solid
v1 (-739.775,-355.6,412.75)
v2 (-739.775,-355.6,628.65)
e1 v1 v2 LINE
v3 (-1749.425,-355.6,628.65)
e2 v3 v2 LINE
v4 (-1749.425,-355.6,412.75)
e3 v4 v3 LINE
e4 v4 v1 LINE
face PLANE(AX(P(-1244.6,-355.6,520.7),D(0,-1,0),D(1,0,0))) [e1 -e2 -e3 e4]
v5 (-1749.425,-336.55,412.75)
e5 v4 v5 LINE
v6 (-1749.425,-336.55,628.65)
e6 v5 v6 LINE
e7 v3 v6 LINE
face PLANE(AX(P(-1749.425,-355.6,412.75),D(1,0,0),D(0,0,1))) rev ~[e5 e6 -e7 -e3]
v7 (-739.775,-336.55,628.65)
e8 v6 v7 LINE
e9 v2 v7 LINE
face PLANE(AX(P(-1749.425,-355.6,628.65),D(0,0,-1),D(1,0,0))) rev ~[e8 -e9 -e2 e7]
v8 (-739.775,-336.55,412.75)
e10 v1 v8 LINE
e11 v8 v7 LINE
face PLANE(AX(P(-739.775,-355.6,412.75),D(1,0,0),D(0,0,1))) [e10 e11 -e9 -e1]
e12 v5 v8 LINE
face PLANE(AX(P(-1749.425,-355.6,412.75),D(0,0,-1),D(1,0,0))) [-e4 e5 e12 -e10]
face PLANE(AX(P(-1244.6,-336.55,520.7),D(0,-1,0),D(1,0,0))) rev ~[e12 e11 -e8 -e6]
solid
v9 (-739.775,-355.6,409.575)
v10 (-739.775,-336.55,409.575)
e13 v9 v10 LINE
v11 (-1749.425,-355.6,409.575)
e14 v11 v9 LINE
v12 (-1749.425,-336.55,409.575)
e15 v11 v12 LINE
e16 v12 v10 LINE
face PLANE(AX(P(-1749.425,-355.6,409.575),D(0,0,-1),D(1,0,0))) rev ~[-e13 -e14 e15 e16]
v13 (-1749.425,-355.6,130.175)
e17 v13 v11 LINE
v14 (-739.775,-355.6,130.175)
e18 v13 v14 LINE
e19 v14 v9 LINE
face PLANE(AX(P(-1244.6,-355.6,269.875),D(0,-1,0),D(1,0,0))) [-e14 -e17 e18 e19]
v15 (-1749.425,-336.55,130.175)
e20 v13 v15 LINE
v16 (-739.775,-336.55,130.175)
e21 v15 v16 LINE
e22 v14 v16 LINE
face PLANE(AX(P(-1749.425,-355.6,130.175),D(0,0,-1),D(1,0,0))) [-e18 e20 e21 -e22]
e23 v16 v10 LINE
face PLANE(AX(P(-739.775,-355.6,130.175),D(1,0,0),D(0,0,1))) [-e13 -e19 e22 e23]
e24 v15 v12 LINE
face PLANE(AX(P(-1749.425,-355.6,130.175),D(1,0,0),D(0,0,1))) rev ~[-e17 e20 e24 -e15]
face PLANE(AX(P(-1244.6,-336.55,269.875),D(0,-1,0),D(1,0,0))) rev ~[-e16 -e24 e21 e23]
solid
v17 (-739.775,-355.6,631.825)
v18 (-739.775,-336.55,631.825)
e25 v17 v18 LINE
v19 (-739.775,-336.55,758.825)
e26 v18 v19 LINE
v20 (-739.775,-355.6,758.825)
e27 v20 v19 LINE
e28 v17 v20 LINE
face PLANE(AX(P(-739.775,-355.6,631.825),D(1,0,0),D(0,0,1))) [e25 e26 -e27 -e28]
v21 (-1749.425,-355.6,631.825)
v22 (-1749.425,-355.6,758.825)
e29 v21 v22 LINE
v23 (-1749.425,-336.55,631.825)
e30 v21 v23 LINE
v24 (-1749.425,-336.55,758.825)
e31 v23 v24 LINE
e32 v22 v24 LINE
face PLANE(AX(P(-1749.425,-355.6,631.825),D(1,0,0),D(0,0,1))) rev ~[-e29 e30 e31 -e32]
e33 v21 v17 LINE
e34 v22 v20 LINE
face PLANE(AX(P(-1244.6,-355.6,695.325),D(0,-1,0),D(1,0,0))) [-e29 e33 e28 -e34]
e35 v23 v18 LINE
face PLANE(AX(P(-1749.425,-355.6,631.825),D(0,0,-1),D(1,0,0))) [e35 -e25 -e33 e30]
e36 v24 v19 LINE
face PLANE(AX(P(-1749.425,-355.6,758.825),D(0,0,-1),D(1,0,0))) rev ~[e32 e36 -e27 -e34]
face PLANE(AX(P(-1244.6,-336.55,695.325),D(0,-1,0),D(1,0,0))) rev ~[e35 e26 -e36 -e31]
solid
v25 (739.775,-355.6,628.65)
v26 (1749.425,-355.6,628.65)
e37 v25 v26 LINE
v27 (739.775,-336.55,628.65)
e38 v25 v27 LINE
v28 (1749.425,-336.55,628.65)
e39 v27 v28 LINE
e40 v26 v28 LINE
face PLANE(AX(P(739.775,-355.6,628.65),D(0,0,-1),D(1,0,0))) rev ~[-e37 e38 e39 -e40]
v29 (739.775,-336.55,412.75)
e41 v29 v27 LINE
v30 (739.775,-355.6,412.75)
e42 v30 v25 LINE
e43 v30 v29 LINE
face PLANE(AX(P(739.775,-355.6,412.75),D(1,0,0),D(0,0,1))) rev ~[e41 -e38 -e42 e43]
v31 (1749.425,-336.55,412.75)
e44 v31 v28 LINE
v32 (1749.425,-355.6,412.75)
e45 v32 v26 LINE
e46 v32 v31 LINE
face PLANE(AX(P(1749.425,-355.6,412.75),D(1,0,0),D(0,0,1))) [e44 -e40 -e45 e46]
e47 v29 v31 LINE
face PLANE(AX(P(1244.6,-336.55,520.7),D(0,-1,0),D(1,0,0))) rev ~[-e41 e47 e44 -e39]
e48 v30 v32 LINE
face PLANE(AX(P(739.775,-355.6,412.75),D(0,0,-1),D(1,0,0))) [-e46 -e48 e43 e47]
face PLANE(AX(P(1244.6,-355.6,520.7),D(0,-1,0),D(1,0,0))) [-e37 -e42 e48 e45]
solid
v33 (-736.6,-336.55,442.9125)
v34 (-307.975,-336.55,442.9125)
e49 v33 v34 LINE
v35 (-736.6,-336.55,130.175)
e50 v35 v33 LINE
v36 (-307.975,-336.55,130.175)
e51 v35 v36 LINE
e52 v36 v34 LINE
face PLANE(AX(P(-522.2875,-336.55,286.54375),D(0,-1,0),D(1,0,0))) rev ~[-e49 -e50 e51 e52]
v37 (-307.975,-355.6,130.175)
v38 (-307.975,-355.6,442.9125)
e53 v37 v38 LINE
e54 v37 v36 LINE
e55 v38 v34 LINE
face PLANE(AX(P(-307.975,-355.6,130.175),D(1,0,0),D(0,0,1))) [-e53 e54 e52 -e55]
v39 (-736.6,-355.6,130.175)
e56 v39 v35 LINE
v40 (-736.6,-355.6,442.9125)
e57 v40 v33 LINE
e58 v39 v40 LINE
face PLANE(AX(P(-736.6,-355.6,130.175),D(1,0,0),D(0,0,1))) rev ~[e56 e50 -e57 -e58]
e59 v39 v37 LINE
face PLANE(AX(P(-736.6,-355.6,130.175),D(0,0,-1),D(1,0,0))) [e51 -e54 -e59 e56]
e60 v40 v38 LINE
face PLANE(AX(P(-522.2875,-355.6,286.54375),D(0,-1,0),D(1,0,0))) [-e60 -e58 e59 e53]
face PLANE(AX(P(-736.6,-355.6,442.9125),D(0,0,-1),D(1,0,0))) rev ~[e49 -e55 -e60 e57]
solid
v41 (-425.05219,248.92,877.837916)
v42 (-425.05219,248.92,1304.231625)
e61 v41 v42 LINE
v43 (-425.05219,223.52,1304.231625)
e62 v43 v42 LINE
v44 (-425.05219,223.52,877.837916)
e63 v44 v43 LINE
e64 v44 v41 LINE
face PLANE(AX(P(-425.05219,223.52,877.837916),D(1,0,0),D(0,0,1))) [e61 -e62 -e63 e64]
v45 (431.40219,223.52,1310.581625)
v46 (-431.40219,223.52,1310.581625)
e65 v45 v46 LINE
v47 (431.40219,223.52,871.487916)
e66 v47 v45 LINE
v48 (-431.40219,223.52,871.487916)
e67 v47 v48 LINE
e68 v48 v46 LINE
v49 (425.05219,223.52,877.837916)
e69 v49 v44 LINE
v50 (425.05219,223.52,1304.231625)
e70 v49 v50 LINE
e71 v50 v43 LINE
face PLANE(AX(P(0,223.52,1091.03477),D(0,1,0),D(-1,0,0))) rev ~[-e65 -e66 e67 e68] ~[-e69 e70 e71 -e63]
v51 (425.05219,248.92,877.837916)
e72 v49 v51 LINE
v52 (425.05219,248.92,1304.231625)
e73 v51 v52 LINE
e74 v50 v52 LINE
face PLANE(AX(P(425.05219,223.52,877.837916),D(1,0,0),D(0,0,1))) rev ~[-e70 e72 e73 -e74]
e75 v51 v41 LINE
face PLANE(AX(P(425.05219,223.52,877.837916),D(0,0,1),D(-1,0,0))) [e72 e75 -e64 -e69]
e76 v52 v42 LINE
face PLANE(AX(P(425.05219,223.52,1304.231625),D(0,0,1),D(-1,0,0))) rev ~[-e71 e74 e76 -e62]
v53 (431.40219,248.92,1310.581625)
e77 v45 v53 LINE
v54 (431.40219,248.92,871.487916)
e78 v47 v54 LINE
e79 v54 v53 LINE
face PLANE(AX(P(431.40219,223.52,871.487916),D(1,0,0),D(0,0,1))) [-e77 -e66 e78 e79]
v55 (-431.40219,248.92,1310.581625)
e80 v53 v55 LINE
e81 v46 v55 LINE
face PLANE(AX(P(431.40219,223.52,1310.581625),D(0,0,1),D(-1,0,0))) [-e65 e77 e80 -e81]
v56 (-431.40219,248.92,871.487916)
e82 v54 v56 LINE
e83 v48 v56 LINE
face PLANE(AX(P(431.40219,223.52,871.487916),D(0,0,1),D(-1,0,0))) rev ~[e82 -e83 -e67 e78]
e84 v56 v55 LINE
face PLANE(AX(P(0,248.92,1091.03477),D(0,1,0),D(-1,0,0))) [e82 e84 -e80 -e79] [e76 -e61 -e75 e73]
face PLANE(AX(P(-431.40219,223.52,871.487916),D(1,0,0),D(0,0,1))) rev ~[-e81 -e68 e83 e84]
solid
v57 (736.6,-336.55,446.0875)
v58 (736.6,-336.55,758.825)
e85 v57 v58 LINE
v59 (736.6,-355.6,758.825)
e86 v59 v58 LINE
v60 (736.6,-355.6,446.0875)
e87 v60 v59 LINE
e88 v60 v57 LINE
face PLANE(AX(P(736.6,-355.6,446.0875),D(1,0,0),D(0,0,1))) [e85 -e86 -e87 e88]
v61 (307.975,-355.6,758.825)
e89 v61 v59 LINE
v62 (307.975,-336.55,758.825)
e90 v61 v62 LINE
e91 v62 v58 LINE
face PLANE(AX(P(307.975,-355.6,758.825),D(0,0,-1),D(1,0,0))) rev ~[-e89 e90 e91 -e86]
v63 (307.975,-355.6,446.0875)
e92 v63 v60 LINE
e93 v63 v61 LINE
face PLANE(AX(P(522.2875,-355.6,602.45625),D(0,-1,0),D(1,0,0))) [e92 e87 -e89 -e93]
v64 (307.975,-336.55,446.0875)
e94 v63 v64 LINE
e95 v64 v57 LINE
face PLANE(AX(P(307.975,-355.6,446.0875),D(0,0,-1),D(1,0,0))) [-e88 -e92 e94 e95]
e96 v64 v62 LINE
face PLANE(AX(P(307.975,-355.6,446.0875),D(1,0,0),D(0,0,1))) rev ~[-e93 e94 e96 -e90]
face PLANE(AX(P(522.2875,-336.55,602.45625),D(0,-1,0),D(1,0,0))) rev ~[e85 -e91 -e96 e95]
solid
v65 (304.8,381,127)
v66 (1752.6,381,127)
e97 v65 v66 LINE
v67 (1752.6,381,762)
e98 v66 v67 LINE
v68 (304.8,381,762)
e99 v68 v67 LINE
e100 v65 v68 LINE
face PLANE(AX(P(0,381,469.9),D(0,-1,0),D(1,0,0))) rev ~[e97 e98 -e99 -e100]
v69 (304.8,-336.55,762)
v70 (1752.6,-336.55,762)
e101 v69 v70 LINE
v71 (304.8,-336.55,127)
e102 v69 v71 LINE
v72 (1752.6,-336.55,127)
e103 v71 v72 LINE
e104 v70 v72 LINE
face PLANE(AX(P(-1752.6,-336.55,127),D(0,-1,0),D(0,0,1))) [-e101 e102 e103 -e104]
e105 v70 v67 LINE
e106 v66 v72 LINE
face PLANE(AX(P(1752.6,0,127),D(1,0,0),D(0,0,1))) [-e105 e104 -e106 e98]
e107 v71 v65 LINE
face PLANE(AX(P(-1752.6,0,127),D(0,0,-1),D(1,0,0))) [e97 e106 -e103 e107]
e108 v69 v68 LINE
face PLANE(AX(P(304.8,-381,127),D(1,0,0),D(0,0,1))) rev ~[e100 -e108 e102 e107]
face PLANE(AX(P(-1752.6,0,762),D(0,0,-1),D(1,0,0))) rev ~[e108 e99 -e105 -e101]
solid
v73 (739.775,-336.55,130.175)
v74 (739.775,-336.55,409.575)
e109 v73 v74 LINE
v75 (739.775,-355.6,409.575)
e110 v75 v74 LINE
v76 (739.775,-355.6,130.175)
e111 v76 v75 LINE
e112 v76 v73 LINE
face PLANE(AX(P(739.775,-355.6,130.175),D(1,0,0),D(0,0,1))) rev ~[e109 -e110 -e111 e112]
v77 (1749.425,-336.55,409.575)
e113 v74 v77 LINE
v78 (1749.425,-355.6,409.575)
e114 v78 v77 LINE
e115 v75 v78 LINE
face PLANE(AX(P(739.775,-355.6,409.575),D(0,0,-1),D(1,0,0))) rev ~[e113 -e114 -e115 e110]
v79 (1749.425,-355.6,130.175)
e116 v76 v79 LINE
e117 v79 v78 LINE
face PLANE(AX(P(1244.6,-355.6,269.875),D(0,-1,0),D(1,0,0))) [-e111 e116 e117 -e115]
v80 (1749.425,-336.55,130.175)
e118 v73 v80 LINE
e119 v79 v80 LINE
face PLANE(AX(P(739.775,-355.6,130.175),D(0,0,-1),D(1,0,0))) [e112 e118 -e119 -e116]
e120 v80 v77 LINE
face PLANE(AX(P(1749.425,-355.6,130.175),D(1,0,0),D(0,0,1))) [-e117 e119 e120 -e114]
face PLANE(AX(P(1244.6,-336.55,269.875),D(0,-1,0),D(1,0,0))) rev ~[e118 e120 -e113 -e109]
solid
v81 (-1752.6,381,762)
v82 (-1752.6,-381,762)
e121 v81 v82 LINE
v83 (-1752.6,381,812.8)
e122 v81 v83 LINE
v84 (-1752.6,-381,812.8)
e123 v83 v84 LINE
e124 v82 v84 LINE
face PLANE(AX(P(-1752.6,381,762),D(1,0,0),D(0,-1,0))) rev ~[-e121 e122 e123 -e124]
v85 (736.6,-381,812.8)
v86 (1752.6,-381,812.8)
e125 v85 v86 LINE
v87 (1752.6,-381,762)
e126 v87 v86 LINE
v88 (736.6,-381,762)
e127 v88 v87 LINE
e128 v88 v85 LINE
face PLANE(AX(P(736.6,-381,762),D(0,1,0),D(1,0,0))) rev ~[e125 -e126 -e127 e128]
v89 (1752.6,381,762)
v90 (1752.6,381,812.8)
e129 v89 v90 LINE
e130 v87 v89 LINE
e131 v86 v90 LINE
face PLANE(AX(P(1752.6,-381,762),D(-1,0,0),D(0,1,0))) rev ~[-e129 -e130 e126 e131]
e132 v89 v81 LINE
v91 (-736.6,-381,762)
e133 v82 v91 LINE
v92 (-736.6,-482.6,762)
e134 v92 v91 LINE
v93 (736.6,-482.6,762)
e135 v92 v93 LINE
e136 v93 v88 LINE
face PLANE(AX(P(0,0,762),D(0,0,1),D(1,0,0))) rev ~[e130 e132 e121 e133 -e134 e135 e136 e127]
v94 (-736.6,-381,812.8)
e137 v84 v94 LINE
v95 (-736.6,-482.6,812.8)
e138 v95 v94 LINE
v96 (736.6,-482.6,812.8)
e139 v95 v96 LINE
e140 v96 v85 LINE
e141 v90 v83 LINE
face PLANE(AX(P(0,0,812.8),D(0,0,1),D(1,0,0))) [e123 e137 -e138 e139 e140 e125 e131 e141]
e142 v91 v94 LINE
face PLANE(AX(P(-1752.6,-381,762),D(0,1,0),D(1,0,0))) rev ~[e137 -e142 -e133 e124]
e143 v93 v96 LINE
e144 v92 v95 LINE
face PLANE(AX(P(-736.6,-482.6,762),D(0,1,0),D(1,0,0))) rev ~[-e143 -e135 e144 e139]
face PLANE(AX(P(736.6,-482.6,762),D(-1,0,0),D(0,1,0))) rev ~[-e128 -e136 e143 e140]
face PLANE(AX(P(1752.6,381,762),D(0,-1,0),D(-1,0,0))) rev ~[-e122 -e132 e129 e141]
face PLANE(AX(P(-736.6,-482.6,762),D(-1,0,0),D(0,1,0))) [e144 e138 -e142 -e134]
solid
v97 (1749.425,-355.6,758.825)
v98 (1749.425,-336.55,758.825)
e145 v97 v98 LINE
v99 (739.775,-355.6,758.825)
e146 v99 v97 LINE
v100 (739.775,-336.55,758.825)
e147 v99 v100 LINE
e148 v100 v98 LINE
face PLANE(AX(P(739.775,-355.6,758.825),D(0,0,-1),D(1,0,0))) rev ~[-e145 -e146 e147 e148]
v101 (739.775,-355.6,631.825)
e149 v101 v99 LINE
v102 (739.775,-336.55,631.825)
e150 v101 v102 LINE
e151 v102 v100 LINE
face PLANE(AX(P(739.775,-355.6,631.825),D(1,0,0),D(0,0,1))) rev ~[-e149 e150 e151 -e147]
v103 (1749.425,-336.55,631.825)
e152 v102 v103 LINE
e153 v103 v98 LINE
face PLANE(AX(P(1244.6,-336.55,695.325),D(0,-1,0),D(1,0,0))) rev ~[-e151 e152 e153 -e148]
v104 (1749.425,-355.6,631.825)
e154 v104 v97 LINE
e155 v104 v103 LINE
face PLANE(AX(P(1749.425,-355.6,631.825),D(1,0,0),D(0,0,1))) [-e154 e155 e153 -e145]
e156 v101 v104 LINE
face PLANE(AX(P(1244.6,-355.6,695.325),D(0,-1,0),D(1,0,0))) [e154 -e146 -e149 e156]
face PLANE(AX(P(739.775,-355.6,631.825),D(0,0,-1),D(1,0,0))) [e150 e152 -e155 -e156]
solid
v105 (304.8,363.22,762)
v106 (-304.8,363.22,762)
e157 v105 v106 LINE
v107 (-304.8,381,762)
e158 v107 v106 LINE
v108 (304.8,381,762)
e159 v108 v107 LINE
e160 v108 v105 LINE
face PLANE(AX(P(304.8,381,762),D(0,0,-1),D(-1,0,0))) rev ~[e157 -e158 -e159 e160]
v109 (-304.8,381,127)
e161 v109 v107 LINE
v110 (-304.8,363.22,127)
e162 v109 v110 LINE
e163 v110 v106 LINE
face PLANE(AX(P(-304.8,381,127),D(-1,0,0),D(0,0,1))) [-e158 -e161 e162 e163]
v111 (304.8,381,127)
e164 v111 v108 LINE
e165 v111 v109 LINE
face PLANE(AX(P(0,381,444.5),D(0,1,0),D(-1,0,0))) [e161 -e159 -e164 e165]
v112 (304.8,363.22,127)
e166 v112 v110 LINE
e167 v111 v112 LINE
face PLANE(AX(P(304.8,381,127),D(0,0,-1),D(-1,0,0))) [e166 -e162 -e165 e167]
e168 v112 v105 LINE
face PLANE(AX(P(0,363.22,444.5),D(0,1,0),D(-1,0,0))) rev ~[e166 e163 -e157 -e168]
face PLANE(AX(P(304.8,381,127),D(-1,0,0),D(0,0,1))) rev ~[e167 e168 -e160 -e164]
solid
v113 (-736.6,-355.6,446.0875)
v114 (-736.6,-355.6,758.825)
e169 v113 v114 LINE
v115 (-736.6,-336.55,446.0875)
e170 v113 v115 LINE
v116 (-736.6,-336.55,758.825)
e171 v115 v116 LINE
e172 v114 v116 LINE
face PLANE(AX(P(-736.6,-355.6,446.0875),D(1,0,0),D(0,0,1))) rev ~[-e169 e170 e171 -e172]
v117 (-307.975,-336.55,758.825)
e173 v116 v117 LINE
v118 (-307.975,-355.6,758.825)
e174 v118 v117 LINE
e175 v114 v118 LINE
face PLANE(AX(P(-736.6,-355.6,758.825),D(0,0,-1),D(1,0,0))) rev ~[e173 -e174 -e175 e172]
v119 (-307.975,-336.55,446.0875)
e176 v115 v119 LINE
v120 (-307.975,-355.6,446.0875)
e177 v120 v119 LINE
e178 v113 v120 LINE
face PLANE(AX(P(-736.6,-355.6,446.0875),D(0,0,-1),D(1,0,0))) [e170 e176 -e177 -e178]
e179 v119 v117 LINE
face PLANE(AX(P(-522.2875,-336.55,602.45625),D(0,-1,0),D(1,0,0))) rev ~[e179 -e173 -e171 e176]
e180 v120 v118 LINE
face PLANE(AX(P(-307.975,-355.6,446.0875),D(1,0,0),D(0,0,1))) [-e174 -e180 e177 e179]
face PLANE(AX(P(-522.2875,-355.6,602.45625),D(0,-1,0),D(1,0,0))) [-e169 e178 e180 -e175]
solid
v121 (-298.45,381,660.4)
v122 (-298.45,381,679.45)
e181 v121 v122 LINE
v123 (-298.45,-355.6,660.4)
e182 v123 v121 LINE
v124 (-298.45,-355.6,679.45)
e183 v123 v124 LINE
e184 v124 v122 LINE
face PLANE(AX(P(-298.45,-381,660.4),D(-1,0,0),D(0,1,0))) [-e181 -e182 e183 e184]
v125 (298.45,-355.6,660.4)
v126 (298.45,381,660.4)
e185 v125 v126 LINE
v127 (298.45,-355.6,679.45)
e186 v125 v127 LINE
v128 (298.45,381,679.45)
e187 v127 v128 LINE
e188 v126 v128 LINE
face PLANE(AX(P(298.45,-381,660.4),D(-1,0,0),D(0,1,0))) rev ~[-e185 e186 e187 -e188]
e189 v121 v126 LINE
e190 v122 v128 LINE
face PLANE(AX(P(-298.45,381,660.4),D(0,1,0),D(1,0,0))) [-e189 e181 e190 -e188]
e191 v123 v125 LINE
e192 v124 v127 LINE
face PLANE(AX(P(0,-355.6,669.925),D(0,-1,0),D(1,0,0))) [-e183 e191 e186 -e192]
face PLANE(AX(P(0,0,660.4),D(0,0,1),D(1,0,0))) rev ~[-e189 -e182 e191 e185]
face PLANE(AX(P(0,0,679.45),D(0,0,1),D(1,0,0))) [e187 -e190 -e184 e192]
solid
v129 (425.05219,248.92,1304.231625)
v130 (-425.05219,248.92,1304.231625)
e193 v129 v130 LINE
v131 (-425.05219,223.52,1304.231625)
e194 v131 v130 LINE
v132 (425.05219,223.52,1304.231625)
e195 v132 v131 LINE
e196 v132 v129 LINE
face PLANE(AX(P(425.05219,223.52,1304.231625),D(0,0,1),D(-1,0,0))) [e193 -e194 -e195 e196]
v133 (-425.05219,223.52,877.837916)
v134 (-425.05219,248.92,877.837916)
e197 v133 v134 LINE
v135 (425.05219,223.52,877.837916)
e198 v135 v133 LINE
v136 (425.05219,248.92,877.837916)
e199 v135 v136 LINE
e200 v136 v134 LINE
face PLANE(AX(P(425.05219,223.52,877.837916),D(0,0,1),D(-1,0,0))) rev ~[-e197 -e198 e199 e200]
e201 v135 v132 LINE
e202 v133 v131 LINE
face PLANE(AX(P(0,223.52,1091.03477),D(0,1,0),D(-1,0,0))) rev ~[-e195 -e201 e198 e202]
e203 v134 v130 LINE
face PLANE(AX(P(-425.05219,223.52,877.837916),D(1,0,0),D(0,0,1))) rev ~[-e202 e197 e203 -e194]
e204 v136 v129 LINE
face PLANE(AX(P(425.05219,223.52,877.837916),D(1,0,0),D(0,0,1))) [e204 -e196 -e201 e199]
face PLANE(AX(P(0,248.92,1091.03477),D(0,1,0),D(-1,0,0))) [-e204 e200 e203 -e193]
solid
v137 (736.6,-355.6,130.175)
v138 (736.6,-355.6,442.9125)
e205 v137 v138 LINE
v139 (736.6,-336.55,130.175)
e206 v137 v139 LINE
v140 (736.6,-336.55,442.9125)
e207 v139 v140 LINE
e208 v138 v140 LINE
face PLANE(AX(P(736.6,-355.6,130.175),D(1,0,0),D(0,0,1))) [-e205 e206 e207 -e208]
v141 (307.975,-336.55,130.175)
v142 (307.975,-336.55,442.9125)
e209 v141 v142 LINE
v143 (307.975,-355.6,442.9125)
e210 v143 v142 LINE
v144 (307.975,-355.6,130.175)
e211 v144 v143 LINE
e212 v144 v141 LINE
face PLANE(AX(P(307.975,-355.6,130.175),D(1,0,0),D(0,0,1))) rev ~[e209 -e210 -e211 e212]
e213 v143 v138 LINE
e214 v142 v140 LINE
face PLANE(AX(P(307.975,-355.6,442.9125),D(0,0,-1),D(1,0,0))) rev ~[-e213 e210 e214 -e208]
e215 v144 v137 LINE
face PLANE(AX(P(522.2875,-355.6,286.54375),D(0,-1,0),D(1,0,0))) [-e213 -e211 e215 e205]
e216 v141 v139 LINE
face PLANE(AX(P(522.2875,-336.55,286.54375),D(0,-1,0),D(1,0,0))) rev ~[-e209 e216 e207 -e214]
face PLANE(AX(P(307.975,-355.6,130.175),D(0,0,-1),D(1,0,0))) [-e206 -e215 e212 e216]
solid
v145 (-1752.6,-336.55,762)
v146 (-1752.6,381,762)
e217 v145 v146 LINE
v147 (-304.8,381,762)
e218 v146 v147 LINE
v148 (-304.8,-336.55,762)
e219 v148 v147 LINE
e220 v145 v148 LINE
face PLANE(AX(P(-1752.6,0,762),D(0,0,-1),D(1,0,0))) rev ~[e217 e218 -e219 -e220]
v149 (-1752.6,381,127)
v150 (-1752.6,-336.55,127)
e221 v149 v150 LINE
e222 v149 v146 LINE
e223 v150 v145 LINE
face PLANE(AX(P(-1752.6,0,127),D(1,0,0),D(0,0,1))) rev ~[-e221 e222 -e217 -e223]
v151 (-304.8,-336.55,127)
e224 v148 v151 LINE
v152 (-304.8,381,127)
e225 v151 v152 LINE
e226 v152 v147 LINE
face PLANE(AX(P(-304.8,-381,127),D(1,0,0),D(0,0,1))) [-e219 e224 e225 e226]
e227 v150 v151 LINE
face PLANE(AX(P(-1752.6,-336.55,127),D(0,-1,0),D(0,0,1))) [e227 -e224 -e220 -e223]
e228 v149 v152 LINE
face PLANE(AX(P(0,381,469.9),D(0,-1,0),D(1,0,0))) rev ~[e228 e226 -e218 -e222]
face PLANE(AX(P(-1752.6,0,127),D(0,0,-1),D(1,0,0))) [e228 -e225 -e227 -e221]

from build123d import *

# Parameters (mm, degrees)
F0_W       = 3505.2
F0_H       = 685.8
F1_DEPTH   = 381
F2_W       = 609.6
F2_H       = 635
F3_DEPTH   = 843.28
F5_W       = 596.9
F5_H       = 762
F6_DEPTH   = 19.05
F7_DEPTH   = 50.8
F8_W       = 1473.2
F8_H       = 101.6
F9_DEPTH   = 50.8
F7_FACE1_W = 1447.8
F7_FACE1_H = 635
F6_FACE_W  = 596.9
F6_FACE_H  = 19.05
F10_DEPTH  = 25.4
F11_W      = 1009.65
F11_H      = 127
F12_DEPTH  = 19.05
F11_H_2    = 215.9
F11_H_3    = 279.4
F11_W_2    = 428.625
F11_H_4    = 312.7375
F14_W      = 19.05
F14_H      = 635
F15_DEPTH  = 4173.22
F17_W      = 862.8043793142
F17_H      = 439.093708992
F17_W_2    = 850.1043793142
F17_H_2    = 426.393708992
F18_DEPTH  = 25.4
F19_DEPTH  = 25.4
F20_W      = 609.6
F20_H      = 635
F21_DEPTH  = 17.78


with BuildPart() as f1:
    # F0 (on Front) → F1 (new body, symmetric)
    with BuildSketch(Plane.XZ):
        with Locations((0, 469.9)):
            Rectangle(F0_W, F0_H)
    extrude(amount=F1_DEPTH, both=True)

    # F2 (on face) → F3 (cut)
    with BuildSketch(Plane.XZ.offset(381)):
        with Locations((0, 444.5)):
            Rectangle(F2_W, F2_H)
    extrude(amount=-F3_DEPTH, mode=Mode.SUBTRACT)

    # F7 (cut): a face of the model
    f7_faces = [f1.faces().sort_by_distance(p)[0] for p in [
        (0, 0, 812.8),
    ]]
    extrude(f7_faces, amount=-F7_DEPTH, mode=Mode.SUBTRACT)


with BuildPart() as f6:
    # F5 (on offset) → F6 (new body)
    with BuildSketch(Plane.XY.offset(660.4)):
        Rectangle(F5_W, F5_H)
    extrude(amount=F6_DEPTH)


with BuildPart() as f9:
    # F8 (on face) → F9 (new body)
    with BuildSketch(Plane.XY.offset(762)):
        Polygon((1752.6, 381), (-1752.6, 381), (-1752.6, -381), (-736.6, -381), (736.6, -381), (1752.6, -381), align=None)
        with Locations((0, -431.8)):
            Rectangle(F8_W, F8_H)
    extrude(amount=F9_DEPTH)


with BuildPart() as f10_tool:
    # F7_face1 (on face) + F6_face (on face) → F10 (new body)
    with BuildSketch(Plane(origin=(-1028.7, -381, 444.5), x_dir=(1, 0, 0), z_dir=(0, -1, 0))):
        Rectangle(F7_FACE1_W, F7_FACE1_H)
        with Locations((2057.4, 0)):
            Rectangle(F7_FACE1_W, F7_FACE1_H)
    with BuildSketch(Plane(origin=(0, -381, 669.925), x_dir=(1, 0, 0), z_dir=(0, -1, 0))):
        Rectangle(F6_FACE_W, F6_FACE_H)
    extrude(amount=-F10_DEPTH)


with BuildPart() as f1_1:
    add(f1.part)

    # F10: cut by f10_tool
    add(f10_tool.part, mode=Mode.SUBTRACT)


with BuildPart() as f6_1:
    add(f6.part)

    # F10: cut by f10_tool
    add(f10_tool.part, mode=Mode.SUBTRACT)


with BuildPart() as f12:
    # F11 (on face) → F12 (new body)
    with BuildSketch(Plane.XZ.offset(355.6)):
        with Locations((-1244.6, 695.325)):
            Rectangle(F11_W, F11_H)
    extrude(amount=-F12_DEPTH)


with BuildPart() as f12b:
    # F11 (on face) → F12, piece 2 (new body)
    with BuildSketch(Plane.XZ.offset(355.6)):
        with Locations((-1244.6, 520.7)):
            Rectangle(F11_W, F11_H_2)
    extrude(amount=-F12_DEPTH)


with BuildPart() as f12c:
    # F11 (on face) → F12, piece 3 (new body)
    with BuildSketch(Plane.XZ.offset(355.6)):
        with Locations((-1244.6, 269.875)):
            Rectangle(F11_W, F11_H_3)
    extrude(amount=-F12_DEPTH)


with BuildPart() as f12d:
    # F11 (on face) → F12, piece 4 (new body)
    with BuildSketch(Plane.XZ.offset(355.6)):
        with Locations((1244.6, 269.875)):
            Rectangle(F11_W, F11_H_3)
    extrude(amount=-F12_DEPTH)


with BuildPart() as f12e:
    # F11 (on face) → F12, piece 5 (new body)
    with BuildSketch(Plane.XZ.offset(355.6)):
        with Locations((1244.6, 695.325)):
            Rectangle(F11_W, F11_H)
    extrude(amount=-F12_DEPTH)


with BuildPart() as f12f:
    # F11 (on face) → F12, piece 6 (new body)
    with BuildSketch(Plane.XZ.offset(355.6)):
        with Locations((1244.6, 520.7)):
            Rectangle(F11_W, F11_H_2)
    extrude(amount=-F12_DEPTH)


with BuildPart() as f12g:
    # F11 (on face) → F12, piece 7 (new body)
    with BuildSketch(Plane.XZ.offset(355.6)):
        with Locations((-522.2875, 602.45625)):
            Rectangle(F11_W_2, F11_H_4)
    extrude(amount=-F12_DEPTH)


with BuildPart() as f12h:
    # F11 (on face) → F12, piece 8 (new body)
    with BuildSketch(Plane.XZ.offset(355.6)):
        with Locations((-522.2875, 286.54375)):
            Rectangle(F11_W_2, F11_H_4)
    extrude(amount=-F12_DEPTH)


with BuildPart() as f12i:
    # F11 (on face) → F12, piece 9 (new body)
    with BuildSketch(Plane.XZ.offset(355.6)):
        with Locations((522.2875, 602.45625)):
            Rectangle(F11_W_2, F11_H_4)
    extrude(amount=-F12_DEPTH)


with BuildPart() as f12j:
    # F11 (on face) → F12, piece 10 (new body)
    with BuildSketch(Plane.XZ.offset(355.6)):
        with Locations((522.2875, 286.54375)):
            Rectangle(F11_W_2, F11_H_4)
    extrude(amount=-F12_DEPTH)


with BuildPart() as f1_2:
    add(f1_1.part)

    # F13: cut F12j, F12, F12b, F12c, F12d, F12e, F12f, F12g, F12h, F12i
    add(f12j.part, mode=Mode.SUBTRACT)
    add(f12.part, mode=Mode.SUBTRACT)
    add(f12b.part, mode=Mode.SUBTRACT)
    add(f12c.part, mode=Mode.SUBTRACT)
    add(f12d.part, mode=Mode.SUBTRACT)
    add(f12e.part, mode=Mode.SUBTRACT)
    add(f12f.part, mode=Mode.SUBTRACT)
    add(f12g.part, mode=Mode.SUBTRACT)
    add(f12h.part, mode=Mode.SUBTRACT)
    add(f12i.part, mode=Mode.SUBTRACT)

    # F14 (on face) → F15 (cut)
    with BuildSketch(Plane(origin=(-1752.6, 0, 0), x_dir=(0, -1, 0), z_dir=(-1, 0, 0))):
        with Locations((346.075, 444.5)):
            Rectangle(F14_W, F14_H)
    extrude(amount=-F15_DEPTH, mode=Mode.SUBTRACT)


with BuildPart() as f18:
    # F17 (on offset) → F18 (new body)
    with BuildSketch(Plane(origin=(0, 223.52, 0), x_dir=(-1, 0, 0), z_dir=(0, 1, 0))):
        with Locations((0, 1091.0347700119)):
            Rectangle(F17_W, F17_H)
        with Locations((0, 1091.0347700119)):
            Rectangle(F17_W_2, F17_H_2, mode=Mode.SUBTRACT)
    extrude(amount=F18_DEPTH)


with BuildPart() as f19:
    # F17 (on offset) → F19 (new body)
    with BuildSketch(Plane(origin=(0, 223.52, 0), x_dir=(-1, 0, 0), z_dir=(0, 1, 0))):
        with Locations((0, 1091.0347700119)):
            Rectangle(F17_W_2, F17_H_2)
    extrude(amount=F19_DEPTH)


with BuildPart() as f21:
    # F20 (on face) → F21 (new body)
    with BuildSketch(Plane(origin=(0, 381, 0), x_dir=(-1, 0, 0), z_dir=(0, 1, 0))):
        with Locations((0, 444.5)):
            Rectangle(F20_W, F20_H)
    extrude(amount=-F21_DEPTH)


solid = Compound([f9.part, f6_1.part, f12.part, f12b.part, f12c.part, f12d.part, f12e.part, f12f.part, f12g.part, f12h.part, f12i.part, f12j.part, f1_2.part, f18.part, f19.part, f21.part])
